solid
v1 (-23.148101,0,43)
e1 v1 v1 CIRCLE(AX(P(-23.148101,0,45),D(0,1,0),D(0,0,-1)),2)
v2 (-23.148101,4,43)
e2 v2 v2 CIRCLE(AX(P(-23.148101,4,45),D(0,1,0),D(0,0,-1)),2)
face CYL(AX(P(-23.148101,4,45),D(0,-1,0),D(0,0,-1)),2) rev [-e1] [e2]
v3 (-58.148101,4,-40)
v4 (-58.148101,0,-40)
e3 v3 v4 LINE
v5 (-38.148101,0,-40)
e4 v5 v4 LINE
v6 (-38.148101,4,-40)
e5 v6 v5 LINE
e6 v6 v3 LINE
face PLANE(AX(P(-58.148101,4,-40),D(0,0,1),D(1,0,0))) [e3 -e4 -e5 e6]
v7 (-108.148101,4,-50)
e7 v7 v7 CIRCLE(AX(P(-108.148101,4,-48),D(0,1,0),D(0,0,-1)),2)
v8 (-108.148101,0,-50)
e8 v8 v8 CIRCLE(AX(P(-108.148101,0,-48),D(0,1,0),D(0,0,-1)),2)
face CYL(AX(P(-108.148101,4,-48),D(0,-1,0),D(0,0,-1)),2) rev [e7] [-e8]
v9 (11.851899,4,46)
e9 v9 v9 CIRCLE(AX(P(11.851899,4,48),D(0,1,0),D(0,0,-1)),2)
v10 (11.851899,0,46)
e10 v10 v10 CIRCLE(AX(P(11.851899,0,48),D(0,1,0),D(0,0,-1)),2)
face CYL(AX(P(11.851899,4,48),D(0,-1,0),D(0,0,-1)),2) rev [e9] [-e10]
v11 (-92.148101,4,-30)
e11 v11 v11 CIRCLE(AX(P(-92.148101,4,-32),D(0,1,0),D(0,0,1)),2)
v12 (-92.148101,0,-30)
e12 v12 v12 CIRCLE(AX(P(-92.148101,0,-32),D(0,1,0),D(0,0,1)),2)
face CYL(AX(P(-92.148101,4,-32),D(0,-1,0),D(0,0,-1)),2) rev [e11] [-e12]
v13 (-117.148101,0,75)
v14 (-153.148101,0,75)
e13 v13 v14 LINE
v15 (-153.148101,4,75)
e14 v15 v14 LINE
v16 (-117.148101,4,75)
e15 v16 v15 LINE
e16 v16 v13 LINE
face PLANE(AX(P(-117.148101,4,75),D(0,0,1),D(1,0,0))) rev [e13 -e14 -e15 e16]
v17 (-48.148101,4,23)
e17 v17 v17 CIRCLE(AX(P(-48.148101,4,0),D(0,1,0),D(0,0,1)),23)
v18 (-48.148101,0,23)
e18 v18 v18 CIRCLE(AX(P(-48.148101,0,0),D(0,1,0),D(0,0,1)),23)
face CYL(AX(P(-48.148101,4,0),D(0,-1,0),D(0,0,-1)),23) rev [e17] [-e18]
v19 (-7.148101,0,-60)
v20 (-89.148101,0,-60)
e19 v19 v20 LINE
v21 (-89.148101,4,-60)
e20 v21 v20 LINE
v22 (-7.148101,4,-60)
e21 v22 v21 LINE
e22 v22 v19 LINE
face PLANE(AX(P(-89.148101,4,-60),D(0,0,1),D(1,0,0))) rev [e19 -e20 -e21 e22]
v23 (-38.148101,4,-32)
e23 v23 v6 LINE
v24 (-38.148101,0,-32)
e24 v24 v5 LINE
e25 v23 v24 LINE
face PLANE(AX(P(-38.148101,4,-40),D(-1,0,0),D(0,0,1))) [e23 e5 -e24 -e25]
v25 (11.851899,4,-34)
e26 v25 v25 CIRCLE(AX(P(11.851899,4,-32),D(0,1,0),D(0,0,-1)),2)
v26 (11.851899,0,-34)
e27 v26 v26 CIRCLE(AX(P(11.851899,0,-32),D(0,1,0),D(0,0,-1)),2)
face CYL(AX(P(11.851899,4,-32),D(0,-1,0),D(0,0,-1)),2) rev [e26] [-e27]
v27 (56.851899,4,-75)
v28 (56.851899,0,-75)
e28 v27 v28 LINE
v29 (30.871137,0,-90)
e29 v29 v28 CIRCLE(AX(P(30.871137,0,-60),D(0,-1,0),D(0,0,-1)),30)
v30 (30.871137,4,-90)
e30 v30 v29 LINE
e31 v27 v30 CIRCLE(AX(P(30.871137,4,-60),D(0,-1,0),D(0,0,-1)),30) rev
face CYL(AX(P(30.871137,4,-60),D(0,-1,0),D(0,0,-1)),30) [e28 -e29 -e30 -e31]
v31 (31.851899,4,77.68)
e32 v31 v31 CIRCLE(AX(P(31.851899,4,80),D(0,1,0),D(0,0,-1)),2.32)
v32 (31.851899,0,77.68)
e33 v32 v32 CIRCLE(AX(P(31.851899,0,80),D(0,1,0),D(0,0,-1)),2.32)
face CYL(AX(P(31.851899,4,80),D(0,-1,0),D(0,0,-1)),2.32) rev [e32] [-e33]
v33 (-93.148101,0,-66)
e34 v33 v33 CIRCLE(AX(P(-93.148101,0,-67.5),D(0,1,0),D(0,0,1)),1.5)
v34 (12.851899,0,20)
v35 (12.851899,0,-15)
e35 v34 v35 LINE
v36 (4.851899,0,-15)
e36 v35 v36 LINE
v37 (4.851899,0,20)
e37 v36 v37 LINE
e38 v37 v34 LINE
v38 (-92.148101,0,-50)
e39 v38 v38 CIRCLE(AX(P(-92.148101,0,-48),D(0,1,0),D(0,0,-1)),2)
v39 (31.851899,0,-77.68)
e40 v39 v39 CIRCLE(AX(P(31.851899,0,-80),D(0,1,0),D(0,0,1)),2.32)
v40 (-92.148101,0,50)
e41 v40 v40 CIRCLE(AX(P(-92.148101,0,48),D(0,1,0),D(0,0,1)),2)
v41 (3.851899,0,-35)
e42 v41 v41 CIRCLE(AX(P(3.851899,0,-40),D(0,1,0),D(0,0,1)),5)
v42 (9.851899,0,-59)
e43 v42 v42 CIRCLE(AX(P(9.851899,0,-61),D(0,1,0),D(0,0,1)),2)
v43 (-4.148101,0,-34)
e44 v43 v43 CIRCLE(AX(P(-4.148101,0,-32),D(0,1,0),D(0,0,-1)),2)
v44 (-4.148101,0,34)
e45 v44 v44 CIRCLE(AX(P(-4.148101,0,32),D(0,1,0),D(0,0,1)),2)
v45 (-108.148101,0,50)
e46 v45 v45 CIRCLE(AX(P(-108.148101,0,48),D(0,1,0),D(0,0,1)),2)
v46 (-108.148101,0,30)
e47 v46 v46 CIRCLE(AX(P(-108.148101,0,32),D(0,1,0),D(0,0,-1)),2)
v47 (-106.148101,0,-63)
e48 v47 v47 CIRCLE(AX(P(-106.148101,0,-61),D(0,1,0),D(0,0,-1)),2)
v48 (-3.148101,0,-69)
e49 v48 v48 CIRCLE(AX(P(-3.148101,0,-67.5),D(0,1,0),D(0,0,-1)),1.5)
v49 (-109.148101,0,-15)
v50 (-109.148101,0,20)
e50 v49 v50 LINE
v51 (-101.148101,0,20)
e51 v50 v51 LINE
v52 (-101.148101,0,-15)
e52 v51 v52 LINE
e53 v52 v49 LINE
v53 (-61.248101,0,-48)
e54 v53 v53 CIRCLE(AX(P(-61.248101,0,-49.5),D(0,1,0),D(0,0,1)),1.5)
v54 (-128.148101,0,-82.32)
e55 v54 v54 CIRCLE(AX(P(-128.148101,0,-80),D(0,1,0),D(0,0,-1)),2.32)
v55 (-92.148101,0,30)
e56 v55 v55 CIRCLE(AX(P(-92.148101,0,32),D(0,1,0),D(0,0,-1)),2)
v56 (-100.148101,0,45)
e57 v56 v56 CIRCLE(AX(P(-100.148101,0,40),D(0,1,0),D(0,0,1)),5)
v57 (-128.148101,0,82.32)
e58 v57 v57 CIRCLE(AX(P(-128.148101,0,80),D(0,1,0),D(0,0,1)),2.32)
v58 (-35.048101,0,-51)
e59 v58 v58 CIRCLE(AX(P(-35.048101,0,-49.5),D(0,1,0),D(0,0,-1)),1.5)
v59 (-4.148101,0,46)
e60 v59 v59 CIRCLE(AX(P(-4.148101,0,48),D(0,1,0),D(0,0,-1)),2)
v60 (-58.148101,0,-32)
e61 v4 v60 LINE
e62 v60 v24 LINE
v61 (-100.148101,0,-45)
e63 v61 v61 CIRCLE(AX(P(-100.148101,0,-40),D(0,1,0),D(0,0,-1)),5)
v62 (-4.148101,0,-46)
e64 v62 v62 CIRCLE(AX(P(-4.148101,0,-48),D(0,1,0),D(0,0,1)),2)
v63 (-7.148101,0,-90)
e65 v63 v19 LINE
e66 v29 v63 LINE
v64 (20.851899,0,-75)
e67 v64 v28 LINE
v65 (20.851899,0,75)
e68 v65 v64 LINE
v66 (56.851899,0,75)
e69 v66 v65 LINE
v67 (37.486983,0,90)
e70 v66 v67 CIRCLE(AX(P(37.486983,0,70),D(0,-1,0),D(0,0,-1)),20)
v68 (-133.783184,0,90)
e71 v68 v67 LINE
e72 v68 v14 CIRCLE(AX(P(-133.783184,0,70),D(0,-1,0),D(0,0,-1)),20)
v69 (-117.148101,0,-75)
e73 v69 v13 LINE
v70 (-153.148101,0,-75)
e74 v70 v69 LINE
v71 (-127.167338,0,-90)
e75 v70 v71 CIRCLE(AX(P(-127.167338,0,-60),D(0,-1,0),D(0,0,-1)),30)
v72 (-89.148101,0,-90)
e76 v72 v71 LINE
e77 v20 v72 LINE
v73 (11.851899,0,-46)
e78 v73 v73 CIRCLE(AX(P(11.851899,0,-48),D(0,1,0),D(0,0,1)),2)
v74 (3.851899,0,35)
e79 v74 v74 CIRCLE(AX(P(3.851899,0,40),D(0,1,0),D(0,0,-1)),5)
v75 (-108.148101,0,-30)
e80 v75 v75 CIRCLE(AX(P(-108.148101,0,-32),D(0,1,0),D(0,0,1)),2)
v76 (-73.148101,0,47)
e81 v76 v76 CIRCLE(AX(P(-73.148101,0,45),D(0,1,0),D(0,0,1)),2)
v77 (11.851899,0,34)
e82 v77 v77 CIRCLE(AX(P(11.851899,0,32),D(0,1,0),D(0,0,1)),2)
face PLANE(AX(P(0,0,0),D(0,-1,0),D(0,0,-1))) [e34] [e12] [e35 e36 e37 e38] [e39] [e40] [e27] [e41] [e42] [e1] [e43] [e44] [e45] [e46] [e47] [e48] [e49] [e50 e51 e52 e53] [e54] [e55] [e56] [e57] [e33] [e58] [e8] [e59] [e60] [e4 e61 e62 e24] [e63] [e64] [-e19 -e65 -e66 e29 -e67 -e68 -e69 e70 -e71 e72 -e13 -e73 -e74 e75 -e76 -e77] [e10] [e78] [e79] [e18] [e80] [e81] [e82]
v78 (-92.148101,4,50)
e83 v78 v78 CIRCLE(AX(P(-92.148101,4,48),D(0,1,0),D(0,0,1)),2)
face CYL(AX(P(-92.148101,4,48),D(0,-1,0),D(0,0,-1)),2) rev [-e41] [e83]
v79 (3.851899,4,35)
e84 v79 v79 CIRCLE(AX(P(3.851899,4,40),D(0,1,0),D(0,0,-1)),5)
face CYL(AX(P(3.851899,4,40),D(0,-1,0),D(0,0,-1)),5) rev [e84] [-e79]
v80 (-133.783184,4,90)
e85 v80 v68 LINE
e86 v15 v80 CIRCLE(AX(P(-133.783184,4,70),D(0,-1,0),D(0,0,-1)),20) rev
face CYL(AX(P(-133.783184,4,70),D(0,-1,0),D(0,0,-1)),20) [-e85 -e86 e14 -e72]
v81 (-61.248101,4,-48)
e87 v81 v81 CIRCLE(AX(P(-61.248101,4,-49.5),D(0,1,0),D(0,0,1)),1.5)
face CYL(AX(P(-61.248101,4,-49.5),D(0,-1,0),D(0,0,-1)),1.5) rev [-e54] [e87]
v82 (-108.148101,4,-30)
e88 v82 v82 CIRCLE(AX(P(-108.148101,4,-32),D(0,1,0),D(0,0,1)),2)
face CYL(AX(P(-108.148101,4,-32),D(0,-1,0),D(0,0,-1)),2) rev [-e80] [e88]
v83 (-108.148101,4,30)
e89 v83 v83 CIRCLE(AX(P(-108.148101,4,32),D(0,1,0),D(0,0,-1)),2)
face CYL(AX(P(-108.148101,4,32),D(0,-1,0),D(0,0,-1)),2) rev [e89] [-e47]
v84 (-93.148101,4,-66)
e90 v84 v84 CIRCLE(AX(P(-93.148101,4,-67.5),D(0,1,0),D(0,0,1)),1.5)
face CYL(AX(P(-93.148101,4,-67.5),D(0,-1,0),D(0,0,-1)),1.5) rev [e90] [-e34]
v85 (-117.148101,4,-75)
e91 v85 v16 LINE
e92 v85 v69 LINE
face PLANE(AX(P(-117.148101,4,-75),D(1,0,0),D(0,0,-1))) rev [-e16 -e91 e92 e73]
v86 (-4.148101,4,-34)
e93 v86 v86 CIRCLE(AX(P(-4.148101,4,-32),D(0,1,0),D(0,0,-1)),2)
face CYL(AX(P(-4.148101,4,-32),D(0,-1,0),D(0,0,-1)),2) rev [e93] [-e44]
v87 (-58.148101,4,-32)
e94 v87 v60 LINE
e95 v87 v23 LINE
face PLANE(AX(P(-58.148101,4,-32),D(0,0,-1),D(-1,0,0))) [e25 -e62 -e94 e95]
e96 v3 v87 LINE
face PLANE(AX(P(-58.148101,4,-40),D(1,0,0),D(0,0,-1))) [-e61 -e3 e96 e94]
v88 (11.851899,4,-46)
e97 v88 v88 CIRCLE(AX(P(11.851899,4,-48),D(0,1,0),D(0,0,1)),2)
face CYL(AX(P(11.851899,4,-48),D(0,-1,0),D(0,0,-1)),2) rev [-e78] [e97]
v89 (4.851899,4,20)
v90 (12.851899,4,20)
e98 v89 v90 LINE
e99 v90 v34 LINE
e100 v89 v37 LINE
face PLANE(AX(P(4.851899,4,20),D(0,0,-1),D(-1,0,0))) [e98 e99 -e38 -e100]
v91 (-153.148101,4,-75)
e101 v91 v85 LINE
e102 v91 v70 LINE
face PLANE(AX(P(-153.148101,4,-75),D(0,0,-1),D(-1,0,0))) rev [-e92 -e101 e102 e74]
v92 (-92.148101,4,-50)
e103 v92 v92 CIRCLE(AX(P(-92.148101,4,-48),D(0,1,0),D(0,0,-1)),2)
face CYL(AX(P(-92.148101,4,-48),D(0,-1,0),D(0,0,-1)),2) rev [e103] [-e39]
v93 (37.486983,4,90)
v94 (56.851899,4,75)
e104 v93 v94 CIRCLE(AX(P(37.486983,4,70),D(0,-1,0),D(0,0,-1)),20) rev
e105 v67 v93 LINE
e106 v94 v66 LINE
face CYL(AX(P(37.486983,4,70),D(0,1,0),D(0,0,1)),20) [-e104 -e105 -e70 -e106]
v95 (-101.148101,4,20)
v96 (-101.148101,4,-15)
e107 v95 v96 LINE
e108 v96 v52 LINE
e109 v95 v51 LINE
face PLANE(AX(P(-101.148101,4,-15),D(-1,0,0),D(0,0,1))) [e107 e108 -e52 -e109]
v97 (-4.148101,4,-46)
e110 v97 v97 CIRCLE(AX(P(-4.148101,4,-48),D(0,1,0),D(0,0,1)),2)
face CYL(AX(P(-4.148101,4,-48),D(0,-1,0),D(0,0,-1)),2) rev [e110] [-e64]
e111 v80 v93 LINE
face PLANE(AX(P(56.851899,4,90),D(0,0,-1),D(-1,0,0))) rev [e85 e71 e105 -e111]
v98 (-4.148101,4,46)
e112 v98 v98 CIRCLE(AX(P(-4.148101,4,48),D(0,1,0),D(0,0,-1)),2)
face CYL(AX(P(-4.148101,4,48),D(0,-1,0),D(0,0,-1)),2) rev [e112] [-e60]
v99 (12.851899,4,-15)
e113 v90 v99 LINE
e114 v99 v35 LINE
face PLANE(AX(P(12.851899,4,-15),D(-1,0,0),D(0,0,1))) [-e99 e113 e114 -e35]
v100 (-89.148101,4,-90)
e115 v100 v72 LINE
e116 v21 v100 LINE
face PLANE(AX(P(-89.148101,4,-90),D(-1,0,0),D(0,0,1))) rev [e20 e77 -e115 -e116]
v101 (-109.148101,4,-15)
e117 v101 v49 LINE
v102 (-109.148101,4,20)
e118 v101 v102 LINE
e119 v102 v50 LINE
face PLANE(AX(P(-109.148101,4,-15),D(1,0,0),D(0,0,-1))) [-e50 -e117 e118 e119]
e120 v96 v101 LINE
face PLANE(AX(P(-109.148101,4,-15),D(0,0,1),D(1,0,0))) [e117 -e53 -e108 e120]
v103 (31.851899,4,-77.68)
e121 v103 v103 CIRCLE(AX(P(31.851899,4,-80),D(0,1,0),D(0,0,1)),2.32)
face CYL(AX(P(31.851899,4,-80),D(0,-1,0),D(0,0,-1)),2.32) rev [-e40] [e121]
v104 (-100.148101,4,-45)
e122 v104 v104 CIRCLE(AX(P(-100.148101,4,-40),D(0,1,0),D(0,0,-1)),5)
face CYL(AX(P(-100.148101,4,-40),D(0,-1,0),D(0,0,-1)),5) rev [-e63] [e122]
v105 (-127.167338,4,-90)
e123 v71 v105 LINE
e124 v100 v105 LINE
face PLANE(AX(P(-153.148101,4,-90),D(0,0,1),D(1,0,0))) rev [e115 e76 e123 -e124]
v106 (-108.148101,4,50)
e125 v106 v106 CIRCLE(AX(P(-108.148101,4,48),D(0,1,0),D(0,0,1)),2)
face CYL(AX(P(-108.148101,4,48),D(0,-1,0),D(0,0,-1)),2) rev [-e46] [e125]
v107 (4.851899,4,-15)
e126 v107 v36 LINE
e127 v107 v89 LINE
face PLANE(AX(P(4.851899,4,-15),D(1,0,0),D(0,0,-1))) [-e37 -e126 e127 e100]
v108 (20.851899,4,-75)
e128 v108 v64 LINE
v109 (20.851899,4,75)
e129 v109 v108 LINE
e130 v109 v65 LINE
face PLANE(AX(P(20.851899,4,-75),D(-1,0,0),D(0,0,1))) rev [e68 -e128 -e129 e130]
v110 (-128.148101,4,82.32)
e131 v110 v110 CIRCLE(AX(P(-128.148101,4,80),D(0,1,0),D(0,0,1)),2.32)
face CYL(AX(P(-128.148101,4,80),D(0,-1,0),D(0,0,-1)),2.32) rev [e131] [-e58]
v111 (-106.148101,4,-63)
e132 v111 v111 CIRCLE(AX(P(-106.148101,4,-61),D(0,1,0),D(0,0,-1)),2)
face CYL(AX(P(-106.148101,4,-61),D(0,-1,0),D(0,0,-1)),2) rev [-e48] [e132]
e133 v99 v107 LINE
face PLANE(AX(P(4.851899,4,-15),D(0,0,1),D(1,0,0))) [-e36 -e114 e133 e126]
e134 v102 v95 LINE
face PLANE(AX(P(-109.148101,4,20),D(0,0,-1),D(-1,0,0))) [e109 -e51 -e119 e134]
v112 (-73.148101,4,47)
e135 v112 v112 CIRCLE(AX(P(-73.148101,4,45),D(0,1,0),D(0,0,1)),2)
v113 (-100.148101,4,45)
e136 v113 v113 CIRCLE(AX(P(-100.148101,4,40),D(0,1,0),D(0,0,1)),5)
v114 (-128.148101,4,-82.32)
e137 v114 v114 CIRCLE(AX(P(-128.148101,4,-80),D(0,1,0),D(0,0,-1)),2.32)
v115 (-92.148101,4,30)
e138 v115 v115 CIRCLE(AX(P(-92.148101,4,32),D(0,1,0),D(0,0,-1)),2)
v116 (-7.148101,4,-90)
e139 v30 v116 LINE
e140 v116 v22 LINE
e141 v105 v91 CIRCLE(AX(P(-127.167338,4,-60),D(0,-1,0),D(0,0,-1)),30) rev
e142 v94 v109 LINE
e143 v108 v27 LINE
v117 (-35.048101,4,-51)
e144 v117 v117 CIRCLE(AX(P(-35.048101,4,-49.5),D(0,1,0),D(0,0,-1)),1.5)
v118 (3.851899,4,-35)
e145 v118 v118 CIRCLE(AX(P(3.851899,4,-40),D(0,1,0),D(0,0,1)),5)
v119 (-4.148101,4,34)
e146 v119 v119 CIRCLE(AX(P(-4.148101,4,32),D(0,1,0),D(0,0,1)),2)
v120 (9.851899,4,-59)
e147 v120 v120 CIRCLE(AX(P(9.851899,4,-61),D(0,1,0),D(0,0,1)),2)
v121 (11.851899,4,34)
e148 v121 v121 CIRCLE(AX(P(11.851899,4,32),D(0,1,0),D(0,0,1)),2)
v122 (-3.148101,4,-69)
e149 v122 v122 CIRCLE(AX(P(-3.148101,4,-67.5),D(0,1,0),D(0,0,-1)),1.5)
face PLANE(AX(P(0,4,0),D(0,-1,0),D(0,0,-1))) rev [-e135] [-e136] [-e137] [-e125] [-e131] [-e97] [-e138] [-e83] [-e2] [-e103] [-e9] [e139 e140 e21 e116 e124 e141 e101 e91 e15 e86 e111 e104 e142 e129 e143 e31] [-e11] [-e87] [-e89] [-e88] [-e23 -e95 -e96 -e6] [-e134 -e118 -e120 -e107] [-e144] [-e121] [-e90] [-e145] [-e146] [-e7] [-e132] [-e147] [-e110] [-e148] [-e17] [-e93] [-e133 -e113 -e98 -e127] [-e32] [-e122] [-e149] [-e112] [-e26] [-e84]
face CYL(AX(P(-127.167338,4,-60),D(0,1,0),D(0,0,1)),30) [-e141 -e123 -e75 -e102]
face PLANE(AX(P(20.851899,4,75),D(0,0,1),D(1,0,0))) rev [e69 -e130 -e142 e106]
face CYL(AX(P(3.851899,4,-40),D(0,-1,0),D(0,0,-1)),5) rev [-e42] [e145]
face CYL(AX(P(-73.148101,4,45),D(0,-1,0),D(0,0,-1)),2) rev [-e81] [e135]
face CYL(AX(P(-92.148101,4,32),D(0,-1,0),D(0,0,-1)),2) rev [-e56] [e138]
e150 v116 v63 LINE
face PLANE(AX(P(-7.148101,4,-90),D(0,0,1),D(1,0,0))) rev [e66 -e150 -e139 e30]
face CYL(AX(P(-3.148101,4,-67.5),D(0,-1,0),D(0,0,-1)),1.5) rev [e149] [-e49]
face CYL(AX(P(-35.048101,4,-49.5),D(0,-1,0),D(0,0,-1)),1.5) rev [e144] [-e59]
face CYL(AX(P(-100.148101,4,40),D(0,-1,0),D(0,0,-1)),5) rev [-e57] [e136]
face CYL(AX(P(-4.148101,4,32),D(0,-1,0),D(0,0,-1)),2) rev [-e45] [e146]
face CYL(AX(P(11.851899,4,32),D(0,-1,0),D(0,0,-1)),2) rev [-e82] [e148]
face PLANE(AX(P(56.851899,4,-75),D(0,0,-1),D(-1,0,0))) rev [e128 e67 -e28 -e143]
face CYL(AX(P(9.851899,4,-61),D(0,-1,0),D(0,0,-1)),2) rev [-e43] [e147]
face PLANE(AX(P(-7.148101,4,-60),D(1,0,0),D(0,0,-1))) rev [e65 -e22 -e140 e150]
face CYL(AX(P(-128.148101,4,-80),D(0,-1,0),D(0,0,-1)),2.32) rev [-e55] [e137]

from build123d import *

# Parameters (mm, degrees)
SKETCH1_R           = 2.32
SKETCH1_R_2         = 2
SKETCH1_R_3         = 5
SKETCH1_R_4         = 23
SKETCH1_R_5         = 1.5
SKETCH1_W           = 8
SKETCH1_H           = 35
SKETCH1_W_2         = 20
SKETCH1_H_2         = 8
BOSS_EXTRUDE1_DEPTH = 4
FILLET1_R           = 30
FILLET2_R           = 20


with BuildPart() as part:
    # Sketch1 → Boss-Extrude1 (new body)
    with BuildSketch(Plane(origin=(0, 0, 0), x_dir=(1, 0, 0), z_dir=(0, 1, 0))):
        Polygon((-153.14810061, 75), (-117.14810061, 75), (-117.14810061, -75), (-153.14810061, -75), (-153.14810061, -90), (56.85189939, -90), (56.85189939, -75), (20.85189939, -75), (20.85189939, 75), (56.85189939, 75), (56.85189939, 90), (20.85189939, 90), (-7.14810061, 90), (-7.14810061, 80), (-7.14810061, 60), (-89.14810061, 60), (-89.14810061, 73), (-89.14810061, 90), (-129.14810061, 90), (-153.14810061, 90), align=None)
        with Locations(Location((-128.14810061, -80, 0), (0, 0, 270))):
            Circle(SKETCH1_R, mode=Mode.SUBTRACT)
        with Locations(Location((-128.14810061, 80, 0), (0, 0, 90))):
            Circle(SKETCH1_R, mode=Mode.SUBTRACT)
        with Locations(Location((31.85189939, 80, 0), (0, 0, 270))):
            Circle(SKETCH1_R, mode=Mode.SUBTRACT)
        with Locations(Location((31.85189939, -80, 0), (0, 0, 90))):
            Circle(SKETCH1_R, mode=Mode.SUBTRACT)
        with Locations(Location((-108.14810061, -48, 0), (0, 0, 270))):
            Circle(SKETCH1_R_2, mode=Mode.SUBTRACT)
        with Locations(Location((-92.14810061, -48, 0), (0, 0, 270))):
            Circle(SKETCH1_R_2, mode=Mode.SUBTRACT)
        with Locations(Location((-92.14810061, -32, 0), (0, 0, 90))):
            Circle(SKETCH1_R_2, mode=Mode.SUBTRACT)
        with Locations(Location((-108.14810061, -32, 0), (0, 0, 90))):
            Circle(SKETCH1_R_2, mode=Mode.SUBTRACT)
        with Locations(Location((-100.14810061, -40, 0), (0, 0, 270))):
            Circle(SKETCH1_R_3, mode=Mode.SUBTRACT)
        with Locations(Location((-92.14810061, 48, 0), (0, 0, 90))):
            Circle(SKETCH1_R_2, mode=Mode.SUBTRACT)
        with Locations(Location((-108.14810061, 48, 0), (0, 0, 90))):
            Circle(SKETCH1_R_2, mode=Mode.SUBTRACT)
        with Locations(Location((-92.14810061, 32, 0), (0, 0, 270))):
            Circle(SKETCH1_R_2, mode=Mode.SUBTRACT)
        with Locations(Location((-100.14810061, 40, 0), (0, 0, 90))):
            Circle(SKETCH1_R_3, mode=Mode.SUBTRACT)
        with Locations(Location((-108.14810061, 32, 0), (0, 0, 270))):
            Circle(SKETCH1_R_2, mode=Mode.SUBTRACT)
        with Locations(Location((-4.14810061, -32, 0), (0, 0, 270))):
            Circle(SKETCH1_R_2, mode=Mode.SUBTRACT)
        with Locations(Location((-4.14810061, -48, 0), (0, 0, 90))):
            Circle(SKETCH1_R_2, mode=Mode.SUBTRACT)
        with Locations(Location((3.85189939, -40, 0), (0, 0, 90))):
            Circle(SKETCH1_R_3, mode=Mode.SUBTRACT)
        with Locations(Location((11.85189939, -48, 0), (0, 0, 90))):
            Circle(SKETCH1_R_2, mode=Mode.SUBTRACT)
        with Locations(Location((11.85189939, -32, 0), (0, 0, 270))):
            Circle(SKETCH1_R_2, mode=Mode.SUBTRACT)
        with Locations(Location((-4.14810061, 32, 0), (0, 0, 90))):
            Circle(SKETCH1_R_2, mode=Mode.SUBTRACT)
        with Locations(Location((-4.14810061, 48, 0), (0, 0, 270))):
            Circle(SKETCH1_R_2, mode=Mode.SUBTRACT)
        with Locations(Location((11.85189939, 32, 0), (0, 0, 90))):
            Circle(SKETCH1_R_2, mode=Mode.SUBTRACT)
        with Locations(Location((11.85189939, 48, 0), (0, 0, 270))):
            Circle(SKETCH1_R_2, mode=Mode.SUBTRACT)
        with Locations(Location((3.85189939, 40, 0), (0, 0, 270))):
            Circle(SKETCH1_R_3, mode=Mode.SUBTRACT)
        with Locations(Location((-48.14810061, 0, 0), (0, 0, 270))):
            Circle(SKETCH1_R_4, mode=Mode.SUBTRACT)
        with Locations(Location((-93.14810061, 67.5, 0), (0, 0, 270))):
            Circle(SKETCH1_R_5, mode=Mode.SUBTRACT)
        with Locations(Location((-3.14810061, 67.5, 0), (0, 0, 90))):
            Circle(SKETCH1_R_5, mode=Mode.SUBTRACT)
        with Locations(Location((-61.24810061, 49.5, 0), (0, 0, 270))):
            Circle(SKETCH1_R_5, mode=Mode.SUBTRACT)
        with Locations(Location((-35.04810061, 49.5, 0), (0, 0, 90))):
            Circle(SKETCH1_R_5, mode=Mode.SUBTRACT)
        with Locations(Location((-73.14810061, -45, 0), (0, 0, 270))):
            Circle(SKETCH1_R_2, mode=Mode.SUBTRACT)
        with Locations(Location((-23.14810061, -45, 0), (0, 0, 90))):
            Circle(SKETCH1_R_2, mode=Mode.SUBTRACT)
        with Locations(Location((9.85189939, 61, 0), (0, 0, 270))):
            Circle(SKETCH1_R_2, mode=Mode.SUBTRACT)
        with Locations(Location((-106.14810061, 61, 0), (0, 0, 90))):
            Circle(SKETCH1_R_2, mode=Mode.SUBTRACT)
        with Locations((-105.14810061, -2.5)):
            Rectangle(SKETCH1_W, SKETCH1_H, mode=Mode.SUBTRACT)
        with Locations((8.85189939, -2.5)):
            Rectangle(SKETCH1_W, SKETCH1_H, mode=Mode.SUBTRACT)
        with Locations((-48.14810061, 36)):
            Rectangle(SKETCH1_W_2, SKETCH1_H_2, mode=Mode.SUBTRACT)
    extrude(amount=BOSS_EXTRUDE1_DEPTH)

    # Fillet1
    # the kernel refuses this fillet: 30 mm, written as the material it takes off along each edge
    with BuildSketch(Plane(origin=(-153.14810061, -64.951905284, -90), x_dir=(1, 0, 0), z_dir=(0, 1, 0))) as fillet1_piece_1:
        with BuildLine():
            CenterArc((25.980762114, -30), FILLET1_R, 90, 60)
            Line((0, -15), (-0.519615242, -14.7))
            ThreePointArc((-0.519615242, -14.7), (-0.6, -7.5), (-0.6, 0))
            Line((-0.6, 0), (0, 0.6))
            Line((0, 0.6), (25.980762114, 0.6))
            Line((25.980762114, 0.6), (25.980762114, 0))
        make_face()
    extrude(amount=133.903810568, mode=Mode.SUBTRACT)
    with BuildSketch(Plane(origin=(56.85189939, -64.951905284, -90), x_dir=(-1, 0, 0), z_dir=(0, 1, 0))) as fillet1_piece_2:
        with BuildLine():
            CenterArc((25.980762114, 30), FILLET1_R, 210, 60)
            Line((0, 15), (-0.519615242, 14.7))
            ThreePointArc((-0.519615242, 14.7), (-0.6, 7.5), (-0.6, 0))
            Line((-0.6, 0), (0, -0.6))
            Line((0, -0.6), (25.980762114, -0.6))
            Line((25.980762114, -0.6), (25.980762114, 0))
        make_face()
    extrude(amount=133.903810568, mode=Mode.SUBTRACT)

    # Fillet2
    # the kernel refuses this fillet: 20 mm, written as the material it takes off along each edge
    with BuildSketch(Plane(origin=(56.85189939, -48.412291828, 90), x_dir=(0, 0, -1), z_dir=(0, 1, 0))) as fillet2_piece_1:
        with BuildLine():
            CenterArc((20, 19.364916731), FILLET2_R, 180, 75.522487814)
            Line((0, 19.364916731), (-0.4, 19.364916731))
            Line((-0.4, 19.364916731), (-0.4, 0))
            Line((-0.4, 0), (0, -0.4))
            ThreePointArc((0, -0.4), (7.5, -0.4), (14.9, -0.387298335))
            Line((14.9, -0.387298335), (15, 0))
        make_face()
    extrude(amount=100.824583655, mode=Mode.SUBTRACT)
    with BuildSketch(Plane(origin=(-153.14810061, -48.412291828, 90), x_dir=(1, 0, 0), z_dir=(0, 1, 0))) as fillet2_piece_2:
        with BuildLine():
            CenterArc((19.364916731, 20), FILLET2_R, 194.477512186, 75.522487814)
            Line((0, 15), (-0.387298335, 14.9))
            ThreePointArc((-0.387298335, 14.9), (-0.4, 7.5), (-0.4, 0))
            Line((-0.4, 0), (0, -0.4))
            Line((0, -0.4), (19.364916731, -0.4))
            Line((19.364916731, -0.4), (19.364916731, 0))
        make_face()
    extrude(amount=100.824583655, mode=Mode.SUBTRACT)


solid = part.part
